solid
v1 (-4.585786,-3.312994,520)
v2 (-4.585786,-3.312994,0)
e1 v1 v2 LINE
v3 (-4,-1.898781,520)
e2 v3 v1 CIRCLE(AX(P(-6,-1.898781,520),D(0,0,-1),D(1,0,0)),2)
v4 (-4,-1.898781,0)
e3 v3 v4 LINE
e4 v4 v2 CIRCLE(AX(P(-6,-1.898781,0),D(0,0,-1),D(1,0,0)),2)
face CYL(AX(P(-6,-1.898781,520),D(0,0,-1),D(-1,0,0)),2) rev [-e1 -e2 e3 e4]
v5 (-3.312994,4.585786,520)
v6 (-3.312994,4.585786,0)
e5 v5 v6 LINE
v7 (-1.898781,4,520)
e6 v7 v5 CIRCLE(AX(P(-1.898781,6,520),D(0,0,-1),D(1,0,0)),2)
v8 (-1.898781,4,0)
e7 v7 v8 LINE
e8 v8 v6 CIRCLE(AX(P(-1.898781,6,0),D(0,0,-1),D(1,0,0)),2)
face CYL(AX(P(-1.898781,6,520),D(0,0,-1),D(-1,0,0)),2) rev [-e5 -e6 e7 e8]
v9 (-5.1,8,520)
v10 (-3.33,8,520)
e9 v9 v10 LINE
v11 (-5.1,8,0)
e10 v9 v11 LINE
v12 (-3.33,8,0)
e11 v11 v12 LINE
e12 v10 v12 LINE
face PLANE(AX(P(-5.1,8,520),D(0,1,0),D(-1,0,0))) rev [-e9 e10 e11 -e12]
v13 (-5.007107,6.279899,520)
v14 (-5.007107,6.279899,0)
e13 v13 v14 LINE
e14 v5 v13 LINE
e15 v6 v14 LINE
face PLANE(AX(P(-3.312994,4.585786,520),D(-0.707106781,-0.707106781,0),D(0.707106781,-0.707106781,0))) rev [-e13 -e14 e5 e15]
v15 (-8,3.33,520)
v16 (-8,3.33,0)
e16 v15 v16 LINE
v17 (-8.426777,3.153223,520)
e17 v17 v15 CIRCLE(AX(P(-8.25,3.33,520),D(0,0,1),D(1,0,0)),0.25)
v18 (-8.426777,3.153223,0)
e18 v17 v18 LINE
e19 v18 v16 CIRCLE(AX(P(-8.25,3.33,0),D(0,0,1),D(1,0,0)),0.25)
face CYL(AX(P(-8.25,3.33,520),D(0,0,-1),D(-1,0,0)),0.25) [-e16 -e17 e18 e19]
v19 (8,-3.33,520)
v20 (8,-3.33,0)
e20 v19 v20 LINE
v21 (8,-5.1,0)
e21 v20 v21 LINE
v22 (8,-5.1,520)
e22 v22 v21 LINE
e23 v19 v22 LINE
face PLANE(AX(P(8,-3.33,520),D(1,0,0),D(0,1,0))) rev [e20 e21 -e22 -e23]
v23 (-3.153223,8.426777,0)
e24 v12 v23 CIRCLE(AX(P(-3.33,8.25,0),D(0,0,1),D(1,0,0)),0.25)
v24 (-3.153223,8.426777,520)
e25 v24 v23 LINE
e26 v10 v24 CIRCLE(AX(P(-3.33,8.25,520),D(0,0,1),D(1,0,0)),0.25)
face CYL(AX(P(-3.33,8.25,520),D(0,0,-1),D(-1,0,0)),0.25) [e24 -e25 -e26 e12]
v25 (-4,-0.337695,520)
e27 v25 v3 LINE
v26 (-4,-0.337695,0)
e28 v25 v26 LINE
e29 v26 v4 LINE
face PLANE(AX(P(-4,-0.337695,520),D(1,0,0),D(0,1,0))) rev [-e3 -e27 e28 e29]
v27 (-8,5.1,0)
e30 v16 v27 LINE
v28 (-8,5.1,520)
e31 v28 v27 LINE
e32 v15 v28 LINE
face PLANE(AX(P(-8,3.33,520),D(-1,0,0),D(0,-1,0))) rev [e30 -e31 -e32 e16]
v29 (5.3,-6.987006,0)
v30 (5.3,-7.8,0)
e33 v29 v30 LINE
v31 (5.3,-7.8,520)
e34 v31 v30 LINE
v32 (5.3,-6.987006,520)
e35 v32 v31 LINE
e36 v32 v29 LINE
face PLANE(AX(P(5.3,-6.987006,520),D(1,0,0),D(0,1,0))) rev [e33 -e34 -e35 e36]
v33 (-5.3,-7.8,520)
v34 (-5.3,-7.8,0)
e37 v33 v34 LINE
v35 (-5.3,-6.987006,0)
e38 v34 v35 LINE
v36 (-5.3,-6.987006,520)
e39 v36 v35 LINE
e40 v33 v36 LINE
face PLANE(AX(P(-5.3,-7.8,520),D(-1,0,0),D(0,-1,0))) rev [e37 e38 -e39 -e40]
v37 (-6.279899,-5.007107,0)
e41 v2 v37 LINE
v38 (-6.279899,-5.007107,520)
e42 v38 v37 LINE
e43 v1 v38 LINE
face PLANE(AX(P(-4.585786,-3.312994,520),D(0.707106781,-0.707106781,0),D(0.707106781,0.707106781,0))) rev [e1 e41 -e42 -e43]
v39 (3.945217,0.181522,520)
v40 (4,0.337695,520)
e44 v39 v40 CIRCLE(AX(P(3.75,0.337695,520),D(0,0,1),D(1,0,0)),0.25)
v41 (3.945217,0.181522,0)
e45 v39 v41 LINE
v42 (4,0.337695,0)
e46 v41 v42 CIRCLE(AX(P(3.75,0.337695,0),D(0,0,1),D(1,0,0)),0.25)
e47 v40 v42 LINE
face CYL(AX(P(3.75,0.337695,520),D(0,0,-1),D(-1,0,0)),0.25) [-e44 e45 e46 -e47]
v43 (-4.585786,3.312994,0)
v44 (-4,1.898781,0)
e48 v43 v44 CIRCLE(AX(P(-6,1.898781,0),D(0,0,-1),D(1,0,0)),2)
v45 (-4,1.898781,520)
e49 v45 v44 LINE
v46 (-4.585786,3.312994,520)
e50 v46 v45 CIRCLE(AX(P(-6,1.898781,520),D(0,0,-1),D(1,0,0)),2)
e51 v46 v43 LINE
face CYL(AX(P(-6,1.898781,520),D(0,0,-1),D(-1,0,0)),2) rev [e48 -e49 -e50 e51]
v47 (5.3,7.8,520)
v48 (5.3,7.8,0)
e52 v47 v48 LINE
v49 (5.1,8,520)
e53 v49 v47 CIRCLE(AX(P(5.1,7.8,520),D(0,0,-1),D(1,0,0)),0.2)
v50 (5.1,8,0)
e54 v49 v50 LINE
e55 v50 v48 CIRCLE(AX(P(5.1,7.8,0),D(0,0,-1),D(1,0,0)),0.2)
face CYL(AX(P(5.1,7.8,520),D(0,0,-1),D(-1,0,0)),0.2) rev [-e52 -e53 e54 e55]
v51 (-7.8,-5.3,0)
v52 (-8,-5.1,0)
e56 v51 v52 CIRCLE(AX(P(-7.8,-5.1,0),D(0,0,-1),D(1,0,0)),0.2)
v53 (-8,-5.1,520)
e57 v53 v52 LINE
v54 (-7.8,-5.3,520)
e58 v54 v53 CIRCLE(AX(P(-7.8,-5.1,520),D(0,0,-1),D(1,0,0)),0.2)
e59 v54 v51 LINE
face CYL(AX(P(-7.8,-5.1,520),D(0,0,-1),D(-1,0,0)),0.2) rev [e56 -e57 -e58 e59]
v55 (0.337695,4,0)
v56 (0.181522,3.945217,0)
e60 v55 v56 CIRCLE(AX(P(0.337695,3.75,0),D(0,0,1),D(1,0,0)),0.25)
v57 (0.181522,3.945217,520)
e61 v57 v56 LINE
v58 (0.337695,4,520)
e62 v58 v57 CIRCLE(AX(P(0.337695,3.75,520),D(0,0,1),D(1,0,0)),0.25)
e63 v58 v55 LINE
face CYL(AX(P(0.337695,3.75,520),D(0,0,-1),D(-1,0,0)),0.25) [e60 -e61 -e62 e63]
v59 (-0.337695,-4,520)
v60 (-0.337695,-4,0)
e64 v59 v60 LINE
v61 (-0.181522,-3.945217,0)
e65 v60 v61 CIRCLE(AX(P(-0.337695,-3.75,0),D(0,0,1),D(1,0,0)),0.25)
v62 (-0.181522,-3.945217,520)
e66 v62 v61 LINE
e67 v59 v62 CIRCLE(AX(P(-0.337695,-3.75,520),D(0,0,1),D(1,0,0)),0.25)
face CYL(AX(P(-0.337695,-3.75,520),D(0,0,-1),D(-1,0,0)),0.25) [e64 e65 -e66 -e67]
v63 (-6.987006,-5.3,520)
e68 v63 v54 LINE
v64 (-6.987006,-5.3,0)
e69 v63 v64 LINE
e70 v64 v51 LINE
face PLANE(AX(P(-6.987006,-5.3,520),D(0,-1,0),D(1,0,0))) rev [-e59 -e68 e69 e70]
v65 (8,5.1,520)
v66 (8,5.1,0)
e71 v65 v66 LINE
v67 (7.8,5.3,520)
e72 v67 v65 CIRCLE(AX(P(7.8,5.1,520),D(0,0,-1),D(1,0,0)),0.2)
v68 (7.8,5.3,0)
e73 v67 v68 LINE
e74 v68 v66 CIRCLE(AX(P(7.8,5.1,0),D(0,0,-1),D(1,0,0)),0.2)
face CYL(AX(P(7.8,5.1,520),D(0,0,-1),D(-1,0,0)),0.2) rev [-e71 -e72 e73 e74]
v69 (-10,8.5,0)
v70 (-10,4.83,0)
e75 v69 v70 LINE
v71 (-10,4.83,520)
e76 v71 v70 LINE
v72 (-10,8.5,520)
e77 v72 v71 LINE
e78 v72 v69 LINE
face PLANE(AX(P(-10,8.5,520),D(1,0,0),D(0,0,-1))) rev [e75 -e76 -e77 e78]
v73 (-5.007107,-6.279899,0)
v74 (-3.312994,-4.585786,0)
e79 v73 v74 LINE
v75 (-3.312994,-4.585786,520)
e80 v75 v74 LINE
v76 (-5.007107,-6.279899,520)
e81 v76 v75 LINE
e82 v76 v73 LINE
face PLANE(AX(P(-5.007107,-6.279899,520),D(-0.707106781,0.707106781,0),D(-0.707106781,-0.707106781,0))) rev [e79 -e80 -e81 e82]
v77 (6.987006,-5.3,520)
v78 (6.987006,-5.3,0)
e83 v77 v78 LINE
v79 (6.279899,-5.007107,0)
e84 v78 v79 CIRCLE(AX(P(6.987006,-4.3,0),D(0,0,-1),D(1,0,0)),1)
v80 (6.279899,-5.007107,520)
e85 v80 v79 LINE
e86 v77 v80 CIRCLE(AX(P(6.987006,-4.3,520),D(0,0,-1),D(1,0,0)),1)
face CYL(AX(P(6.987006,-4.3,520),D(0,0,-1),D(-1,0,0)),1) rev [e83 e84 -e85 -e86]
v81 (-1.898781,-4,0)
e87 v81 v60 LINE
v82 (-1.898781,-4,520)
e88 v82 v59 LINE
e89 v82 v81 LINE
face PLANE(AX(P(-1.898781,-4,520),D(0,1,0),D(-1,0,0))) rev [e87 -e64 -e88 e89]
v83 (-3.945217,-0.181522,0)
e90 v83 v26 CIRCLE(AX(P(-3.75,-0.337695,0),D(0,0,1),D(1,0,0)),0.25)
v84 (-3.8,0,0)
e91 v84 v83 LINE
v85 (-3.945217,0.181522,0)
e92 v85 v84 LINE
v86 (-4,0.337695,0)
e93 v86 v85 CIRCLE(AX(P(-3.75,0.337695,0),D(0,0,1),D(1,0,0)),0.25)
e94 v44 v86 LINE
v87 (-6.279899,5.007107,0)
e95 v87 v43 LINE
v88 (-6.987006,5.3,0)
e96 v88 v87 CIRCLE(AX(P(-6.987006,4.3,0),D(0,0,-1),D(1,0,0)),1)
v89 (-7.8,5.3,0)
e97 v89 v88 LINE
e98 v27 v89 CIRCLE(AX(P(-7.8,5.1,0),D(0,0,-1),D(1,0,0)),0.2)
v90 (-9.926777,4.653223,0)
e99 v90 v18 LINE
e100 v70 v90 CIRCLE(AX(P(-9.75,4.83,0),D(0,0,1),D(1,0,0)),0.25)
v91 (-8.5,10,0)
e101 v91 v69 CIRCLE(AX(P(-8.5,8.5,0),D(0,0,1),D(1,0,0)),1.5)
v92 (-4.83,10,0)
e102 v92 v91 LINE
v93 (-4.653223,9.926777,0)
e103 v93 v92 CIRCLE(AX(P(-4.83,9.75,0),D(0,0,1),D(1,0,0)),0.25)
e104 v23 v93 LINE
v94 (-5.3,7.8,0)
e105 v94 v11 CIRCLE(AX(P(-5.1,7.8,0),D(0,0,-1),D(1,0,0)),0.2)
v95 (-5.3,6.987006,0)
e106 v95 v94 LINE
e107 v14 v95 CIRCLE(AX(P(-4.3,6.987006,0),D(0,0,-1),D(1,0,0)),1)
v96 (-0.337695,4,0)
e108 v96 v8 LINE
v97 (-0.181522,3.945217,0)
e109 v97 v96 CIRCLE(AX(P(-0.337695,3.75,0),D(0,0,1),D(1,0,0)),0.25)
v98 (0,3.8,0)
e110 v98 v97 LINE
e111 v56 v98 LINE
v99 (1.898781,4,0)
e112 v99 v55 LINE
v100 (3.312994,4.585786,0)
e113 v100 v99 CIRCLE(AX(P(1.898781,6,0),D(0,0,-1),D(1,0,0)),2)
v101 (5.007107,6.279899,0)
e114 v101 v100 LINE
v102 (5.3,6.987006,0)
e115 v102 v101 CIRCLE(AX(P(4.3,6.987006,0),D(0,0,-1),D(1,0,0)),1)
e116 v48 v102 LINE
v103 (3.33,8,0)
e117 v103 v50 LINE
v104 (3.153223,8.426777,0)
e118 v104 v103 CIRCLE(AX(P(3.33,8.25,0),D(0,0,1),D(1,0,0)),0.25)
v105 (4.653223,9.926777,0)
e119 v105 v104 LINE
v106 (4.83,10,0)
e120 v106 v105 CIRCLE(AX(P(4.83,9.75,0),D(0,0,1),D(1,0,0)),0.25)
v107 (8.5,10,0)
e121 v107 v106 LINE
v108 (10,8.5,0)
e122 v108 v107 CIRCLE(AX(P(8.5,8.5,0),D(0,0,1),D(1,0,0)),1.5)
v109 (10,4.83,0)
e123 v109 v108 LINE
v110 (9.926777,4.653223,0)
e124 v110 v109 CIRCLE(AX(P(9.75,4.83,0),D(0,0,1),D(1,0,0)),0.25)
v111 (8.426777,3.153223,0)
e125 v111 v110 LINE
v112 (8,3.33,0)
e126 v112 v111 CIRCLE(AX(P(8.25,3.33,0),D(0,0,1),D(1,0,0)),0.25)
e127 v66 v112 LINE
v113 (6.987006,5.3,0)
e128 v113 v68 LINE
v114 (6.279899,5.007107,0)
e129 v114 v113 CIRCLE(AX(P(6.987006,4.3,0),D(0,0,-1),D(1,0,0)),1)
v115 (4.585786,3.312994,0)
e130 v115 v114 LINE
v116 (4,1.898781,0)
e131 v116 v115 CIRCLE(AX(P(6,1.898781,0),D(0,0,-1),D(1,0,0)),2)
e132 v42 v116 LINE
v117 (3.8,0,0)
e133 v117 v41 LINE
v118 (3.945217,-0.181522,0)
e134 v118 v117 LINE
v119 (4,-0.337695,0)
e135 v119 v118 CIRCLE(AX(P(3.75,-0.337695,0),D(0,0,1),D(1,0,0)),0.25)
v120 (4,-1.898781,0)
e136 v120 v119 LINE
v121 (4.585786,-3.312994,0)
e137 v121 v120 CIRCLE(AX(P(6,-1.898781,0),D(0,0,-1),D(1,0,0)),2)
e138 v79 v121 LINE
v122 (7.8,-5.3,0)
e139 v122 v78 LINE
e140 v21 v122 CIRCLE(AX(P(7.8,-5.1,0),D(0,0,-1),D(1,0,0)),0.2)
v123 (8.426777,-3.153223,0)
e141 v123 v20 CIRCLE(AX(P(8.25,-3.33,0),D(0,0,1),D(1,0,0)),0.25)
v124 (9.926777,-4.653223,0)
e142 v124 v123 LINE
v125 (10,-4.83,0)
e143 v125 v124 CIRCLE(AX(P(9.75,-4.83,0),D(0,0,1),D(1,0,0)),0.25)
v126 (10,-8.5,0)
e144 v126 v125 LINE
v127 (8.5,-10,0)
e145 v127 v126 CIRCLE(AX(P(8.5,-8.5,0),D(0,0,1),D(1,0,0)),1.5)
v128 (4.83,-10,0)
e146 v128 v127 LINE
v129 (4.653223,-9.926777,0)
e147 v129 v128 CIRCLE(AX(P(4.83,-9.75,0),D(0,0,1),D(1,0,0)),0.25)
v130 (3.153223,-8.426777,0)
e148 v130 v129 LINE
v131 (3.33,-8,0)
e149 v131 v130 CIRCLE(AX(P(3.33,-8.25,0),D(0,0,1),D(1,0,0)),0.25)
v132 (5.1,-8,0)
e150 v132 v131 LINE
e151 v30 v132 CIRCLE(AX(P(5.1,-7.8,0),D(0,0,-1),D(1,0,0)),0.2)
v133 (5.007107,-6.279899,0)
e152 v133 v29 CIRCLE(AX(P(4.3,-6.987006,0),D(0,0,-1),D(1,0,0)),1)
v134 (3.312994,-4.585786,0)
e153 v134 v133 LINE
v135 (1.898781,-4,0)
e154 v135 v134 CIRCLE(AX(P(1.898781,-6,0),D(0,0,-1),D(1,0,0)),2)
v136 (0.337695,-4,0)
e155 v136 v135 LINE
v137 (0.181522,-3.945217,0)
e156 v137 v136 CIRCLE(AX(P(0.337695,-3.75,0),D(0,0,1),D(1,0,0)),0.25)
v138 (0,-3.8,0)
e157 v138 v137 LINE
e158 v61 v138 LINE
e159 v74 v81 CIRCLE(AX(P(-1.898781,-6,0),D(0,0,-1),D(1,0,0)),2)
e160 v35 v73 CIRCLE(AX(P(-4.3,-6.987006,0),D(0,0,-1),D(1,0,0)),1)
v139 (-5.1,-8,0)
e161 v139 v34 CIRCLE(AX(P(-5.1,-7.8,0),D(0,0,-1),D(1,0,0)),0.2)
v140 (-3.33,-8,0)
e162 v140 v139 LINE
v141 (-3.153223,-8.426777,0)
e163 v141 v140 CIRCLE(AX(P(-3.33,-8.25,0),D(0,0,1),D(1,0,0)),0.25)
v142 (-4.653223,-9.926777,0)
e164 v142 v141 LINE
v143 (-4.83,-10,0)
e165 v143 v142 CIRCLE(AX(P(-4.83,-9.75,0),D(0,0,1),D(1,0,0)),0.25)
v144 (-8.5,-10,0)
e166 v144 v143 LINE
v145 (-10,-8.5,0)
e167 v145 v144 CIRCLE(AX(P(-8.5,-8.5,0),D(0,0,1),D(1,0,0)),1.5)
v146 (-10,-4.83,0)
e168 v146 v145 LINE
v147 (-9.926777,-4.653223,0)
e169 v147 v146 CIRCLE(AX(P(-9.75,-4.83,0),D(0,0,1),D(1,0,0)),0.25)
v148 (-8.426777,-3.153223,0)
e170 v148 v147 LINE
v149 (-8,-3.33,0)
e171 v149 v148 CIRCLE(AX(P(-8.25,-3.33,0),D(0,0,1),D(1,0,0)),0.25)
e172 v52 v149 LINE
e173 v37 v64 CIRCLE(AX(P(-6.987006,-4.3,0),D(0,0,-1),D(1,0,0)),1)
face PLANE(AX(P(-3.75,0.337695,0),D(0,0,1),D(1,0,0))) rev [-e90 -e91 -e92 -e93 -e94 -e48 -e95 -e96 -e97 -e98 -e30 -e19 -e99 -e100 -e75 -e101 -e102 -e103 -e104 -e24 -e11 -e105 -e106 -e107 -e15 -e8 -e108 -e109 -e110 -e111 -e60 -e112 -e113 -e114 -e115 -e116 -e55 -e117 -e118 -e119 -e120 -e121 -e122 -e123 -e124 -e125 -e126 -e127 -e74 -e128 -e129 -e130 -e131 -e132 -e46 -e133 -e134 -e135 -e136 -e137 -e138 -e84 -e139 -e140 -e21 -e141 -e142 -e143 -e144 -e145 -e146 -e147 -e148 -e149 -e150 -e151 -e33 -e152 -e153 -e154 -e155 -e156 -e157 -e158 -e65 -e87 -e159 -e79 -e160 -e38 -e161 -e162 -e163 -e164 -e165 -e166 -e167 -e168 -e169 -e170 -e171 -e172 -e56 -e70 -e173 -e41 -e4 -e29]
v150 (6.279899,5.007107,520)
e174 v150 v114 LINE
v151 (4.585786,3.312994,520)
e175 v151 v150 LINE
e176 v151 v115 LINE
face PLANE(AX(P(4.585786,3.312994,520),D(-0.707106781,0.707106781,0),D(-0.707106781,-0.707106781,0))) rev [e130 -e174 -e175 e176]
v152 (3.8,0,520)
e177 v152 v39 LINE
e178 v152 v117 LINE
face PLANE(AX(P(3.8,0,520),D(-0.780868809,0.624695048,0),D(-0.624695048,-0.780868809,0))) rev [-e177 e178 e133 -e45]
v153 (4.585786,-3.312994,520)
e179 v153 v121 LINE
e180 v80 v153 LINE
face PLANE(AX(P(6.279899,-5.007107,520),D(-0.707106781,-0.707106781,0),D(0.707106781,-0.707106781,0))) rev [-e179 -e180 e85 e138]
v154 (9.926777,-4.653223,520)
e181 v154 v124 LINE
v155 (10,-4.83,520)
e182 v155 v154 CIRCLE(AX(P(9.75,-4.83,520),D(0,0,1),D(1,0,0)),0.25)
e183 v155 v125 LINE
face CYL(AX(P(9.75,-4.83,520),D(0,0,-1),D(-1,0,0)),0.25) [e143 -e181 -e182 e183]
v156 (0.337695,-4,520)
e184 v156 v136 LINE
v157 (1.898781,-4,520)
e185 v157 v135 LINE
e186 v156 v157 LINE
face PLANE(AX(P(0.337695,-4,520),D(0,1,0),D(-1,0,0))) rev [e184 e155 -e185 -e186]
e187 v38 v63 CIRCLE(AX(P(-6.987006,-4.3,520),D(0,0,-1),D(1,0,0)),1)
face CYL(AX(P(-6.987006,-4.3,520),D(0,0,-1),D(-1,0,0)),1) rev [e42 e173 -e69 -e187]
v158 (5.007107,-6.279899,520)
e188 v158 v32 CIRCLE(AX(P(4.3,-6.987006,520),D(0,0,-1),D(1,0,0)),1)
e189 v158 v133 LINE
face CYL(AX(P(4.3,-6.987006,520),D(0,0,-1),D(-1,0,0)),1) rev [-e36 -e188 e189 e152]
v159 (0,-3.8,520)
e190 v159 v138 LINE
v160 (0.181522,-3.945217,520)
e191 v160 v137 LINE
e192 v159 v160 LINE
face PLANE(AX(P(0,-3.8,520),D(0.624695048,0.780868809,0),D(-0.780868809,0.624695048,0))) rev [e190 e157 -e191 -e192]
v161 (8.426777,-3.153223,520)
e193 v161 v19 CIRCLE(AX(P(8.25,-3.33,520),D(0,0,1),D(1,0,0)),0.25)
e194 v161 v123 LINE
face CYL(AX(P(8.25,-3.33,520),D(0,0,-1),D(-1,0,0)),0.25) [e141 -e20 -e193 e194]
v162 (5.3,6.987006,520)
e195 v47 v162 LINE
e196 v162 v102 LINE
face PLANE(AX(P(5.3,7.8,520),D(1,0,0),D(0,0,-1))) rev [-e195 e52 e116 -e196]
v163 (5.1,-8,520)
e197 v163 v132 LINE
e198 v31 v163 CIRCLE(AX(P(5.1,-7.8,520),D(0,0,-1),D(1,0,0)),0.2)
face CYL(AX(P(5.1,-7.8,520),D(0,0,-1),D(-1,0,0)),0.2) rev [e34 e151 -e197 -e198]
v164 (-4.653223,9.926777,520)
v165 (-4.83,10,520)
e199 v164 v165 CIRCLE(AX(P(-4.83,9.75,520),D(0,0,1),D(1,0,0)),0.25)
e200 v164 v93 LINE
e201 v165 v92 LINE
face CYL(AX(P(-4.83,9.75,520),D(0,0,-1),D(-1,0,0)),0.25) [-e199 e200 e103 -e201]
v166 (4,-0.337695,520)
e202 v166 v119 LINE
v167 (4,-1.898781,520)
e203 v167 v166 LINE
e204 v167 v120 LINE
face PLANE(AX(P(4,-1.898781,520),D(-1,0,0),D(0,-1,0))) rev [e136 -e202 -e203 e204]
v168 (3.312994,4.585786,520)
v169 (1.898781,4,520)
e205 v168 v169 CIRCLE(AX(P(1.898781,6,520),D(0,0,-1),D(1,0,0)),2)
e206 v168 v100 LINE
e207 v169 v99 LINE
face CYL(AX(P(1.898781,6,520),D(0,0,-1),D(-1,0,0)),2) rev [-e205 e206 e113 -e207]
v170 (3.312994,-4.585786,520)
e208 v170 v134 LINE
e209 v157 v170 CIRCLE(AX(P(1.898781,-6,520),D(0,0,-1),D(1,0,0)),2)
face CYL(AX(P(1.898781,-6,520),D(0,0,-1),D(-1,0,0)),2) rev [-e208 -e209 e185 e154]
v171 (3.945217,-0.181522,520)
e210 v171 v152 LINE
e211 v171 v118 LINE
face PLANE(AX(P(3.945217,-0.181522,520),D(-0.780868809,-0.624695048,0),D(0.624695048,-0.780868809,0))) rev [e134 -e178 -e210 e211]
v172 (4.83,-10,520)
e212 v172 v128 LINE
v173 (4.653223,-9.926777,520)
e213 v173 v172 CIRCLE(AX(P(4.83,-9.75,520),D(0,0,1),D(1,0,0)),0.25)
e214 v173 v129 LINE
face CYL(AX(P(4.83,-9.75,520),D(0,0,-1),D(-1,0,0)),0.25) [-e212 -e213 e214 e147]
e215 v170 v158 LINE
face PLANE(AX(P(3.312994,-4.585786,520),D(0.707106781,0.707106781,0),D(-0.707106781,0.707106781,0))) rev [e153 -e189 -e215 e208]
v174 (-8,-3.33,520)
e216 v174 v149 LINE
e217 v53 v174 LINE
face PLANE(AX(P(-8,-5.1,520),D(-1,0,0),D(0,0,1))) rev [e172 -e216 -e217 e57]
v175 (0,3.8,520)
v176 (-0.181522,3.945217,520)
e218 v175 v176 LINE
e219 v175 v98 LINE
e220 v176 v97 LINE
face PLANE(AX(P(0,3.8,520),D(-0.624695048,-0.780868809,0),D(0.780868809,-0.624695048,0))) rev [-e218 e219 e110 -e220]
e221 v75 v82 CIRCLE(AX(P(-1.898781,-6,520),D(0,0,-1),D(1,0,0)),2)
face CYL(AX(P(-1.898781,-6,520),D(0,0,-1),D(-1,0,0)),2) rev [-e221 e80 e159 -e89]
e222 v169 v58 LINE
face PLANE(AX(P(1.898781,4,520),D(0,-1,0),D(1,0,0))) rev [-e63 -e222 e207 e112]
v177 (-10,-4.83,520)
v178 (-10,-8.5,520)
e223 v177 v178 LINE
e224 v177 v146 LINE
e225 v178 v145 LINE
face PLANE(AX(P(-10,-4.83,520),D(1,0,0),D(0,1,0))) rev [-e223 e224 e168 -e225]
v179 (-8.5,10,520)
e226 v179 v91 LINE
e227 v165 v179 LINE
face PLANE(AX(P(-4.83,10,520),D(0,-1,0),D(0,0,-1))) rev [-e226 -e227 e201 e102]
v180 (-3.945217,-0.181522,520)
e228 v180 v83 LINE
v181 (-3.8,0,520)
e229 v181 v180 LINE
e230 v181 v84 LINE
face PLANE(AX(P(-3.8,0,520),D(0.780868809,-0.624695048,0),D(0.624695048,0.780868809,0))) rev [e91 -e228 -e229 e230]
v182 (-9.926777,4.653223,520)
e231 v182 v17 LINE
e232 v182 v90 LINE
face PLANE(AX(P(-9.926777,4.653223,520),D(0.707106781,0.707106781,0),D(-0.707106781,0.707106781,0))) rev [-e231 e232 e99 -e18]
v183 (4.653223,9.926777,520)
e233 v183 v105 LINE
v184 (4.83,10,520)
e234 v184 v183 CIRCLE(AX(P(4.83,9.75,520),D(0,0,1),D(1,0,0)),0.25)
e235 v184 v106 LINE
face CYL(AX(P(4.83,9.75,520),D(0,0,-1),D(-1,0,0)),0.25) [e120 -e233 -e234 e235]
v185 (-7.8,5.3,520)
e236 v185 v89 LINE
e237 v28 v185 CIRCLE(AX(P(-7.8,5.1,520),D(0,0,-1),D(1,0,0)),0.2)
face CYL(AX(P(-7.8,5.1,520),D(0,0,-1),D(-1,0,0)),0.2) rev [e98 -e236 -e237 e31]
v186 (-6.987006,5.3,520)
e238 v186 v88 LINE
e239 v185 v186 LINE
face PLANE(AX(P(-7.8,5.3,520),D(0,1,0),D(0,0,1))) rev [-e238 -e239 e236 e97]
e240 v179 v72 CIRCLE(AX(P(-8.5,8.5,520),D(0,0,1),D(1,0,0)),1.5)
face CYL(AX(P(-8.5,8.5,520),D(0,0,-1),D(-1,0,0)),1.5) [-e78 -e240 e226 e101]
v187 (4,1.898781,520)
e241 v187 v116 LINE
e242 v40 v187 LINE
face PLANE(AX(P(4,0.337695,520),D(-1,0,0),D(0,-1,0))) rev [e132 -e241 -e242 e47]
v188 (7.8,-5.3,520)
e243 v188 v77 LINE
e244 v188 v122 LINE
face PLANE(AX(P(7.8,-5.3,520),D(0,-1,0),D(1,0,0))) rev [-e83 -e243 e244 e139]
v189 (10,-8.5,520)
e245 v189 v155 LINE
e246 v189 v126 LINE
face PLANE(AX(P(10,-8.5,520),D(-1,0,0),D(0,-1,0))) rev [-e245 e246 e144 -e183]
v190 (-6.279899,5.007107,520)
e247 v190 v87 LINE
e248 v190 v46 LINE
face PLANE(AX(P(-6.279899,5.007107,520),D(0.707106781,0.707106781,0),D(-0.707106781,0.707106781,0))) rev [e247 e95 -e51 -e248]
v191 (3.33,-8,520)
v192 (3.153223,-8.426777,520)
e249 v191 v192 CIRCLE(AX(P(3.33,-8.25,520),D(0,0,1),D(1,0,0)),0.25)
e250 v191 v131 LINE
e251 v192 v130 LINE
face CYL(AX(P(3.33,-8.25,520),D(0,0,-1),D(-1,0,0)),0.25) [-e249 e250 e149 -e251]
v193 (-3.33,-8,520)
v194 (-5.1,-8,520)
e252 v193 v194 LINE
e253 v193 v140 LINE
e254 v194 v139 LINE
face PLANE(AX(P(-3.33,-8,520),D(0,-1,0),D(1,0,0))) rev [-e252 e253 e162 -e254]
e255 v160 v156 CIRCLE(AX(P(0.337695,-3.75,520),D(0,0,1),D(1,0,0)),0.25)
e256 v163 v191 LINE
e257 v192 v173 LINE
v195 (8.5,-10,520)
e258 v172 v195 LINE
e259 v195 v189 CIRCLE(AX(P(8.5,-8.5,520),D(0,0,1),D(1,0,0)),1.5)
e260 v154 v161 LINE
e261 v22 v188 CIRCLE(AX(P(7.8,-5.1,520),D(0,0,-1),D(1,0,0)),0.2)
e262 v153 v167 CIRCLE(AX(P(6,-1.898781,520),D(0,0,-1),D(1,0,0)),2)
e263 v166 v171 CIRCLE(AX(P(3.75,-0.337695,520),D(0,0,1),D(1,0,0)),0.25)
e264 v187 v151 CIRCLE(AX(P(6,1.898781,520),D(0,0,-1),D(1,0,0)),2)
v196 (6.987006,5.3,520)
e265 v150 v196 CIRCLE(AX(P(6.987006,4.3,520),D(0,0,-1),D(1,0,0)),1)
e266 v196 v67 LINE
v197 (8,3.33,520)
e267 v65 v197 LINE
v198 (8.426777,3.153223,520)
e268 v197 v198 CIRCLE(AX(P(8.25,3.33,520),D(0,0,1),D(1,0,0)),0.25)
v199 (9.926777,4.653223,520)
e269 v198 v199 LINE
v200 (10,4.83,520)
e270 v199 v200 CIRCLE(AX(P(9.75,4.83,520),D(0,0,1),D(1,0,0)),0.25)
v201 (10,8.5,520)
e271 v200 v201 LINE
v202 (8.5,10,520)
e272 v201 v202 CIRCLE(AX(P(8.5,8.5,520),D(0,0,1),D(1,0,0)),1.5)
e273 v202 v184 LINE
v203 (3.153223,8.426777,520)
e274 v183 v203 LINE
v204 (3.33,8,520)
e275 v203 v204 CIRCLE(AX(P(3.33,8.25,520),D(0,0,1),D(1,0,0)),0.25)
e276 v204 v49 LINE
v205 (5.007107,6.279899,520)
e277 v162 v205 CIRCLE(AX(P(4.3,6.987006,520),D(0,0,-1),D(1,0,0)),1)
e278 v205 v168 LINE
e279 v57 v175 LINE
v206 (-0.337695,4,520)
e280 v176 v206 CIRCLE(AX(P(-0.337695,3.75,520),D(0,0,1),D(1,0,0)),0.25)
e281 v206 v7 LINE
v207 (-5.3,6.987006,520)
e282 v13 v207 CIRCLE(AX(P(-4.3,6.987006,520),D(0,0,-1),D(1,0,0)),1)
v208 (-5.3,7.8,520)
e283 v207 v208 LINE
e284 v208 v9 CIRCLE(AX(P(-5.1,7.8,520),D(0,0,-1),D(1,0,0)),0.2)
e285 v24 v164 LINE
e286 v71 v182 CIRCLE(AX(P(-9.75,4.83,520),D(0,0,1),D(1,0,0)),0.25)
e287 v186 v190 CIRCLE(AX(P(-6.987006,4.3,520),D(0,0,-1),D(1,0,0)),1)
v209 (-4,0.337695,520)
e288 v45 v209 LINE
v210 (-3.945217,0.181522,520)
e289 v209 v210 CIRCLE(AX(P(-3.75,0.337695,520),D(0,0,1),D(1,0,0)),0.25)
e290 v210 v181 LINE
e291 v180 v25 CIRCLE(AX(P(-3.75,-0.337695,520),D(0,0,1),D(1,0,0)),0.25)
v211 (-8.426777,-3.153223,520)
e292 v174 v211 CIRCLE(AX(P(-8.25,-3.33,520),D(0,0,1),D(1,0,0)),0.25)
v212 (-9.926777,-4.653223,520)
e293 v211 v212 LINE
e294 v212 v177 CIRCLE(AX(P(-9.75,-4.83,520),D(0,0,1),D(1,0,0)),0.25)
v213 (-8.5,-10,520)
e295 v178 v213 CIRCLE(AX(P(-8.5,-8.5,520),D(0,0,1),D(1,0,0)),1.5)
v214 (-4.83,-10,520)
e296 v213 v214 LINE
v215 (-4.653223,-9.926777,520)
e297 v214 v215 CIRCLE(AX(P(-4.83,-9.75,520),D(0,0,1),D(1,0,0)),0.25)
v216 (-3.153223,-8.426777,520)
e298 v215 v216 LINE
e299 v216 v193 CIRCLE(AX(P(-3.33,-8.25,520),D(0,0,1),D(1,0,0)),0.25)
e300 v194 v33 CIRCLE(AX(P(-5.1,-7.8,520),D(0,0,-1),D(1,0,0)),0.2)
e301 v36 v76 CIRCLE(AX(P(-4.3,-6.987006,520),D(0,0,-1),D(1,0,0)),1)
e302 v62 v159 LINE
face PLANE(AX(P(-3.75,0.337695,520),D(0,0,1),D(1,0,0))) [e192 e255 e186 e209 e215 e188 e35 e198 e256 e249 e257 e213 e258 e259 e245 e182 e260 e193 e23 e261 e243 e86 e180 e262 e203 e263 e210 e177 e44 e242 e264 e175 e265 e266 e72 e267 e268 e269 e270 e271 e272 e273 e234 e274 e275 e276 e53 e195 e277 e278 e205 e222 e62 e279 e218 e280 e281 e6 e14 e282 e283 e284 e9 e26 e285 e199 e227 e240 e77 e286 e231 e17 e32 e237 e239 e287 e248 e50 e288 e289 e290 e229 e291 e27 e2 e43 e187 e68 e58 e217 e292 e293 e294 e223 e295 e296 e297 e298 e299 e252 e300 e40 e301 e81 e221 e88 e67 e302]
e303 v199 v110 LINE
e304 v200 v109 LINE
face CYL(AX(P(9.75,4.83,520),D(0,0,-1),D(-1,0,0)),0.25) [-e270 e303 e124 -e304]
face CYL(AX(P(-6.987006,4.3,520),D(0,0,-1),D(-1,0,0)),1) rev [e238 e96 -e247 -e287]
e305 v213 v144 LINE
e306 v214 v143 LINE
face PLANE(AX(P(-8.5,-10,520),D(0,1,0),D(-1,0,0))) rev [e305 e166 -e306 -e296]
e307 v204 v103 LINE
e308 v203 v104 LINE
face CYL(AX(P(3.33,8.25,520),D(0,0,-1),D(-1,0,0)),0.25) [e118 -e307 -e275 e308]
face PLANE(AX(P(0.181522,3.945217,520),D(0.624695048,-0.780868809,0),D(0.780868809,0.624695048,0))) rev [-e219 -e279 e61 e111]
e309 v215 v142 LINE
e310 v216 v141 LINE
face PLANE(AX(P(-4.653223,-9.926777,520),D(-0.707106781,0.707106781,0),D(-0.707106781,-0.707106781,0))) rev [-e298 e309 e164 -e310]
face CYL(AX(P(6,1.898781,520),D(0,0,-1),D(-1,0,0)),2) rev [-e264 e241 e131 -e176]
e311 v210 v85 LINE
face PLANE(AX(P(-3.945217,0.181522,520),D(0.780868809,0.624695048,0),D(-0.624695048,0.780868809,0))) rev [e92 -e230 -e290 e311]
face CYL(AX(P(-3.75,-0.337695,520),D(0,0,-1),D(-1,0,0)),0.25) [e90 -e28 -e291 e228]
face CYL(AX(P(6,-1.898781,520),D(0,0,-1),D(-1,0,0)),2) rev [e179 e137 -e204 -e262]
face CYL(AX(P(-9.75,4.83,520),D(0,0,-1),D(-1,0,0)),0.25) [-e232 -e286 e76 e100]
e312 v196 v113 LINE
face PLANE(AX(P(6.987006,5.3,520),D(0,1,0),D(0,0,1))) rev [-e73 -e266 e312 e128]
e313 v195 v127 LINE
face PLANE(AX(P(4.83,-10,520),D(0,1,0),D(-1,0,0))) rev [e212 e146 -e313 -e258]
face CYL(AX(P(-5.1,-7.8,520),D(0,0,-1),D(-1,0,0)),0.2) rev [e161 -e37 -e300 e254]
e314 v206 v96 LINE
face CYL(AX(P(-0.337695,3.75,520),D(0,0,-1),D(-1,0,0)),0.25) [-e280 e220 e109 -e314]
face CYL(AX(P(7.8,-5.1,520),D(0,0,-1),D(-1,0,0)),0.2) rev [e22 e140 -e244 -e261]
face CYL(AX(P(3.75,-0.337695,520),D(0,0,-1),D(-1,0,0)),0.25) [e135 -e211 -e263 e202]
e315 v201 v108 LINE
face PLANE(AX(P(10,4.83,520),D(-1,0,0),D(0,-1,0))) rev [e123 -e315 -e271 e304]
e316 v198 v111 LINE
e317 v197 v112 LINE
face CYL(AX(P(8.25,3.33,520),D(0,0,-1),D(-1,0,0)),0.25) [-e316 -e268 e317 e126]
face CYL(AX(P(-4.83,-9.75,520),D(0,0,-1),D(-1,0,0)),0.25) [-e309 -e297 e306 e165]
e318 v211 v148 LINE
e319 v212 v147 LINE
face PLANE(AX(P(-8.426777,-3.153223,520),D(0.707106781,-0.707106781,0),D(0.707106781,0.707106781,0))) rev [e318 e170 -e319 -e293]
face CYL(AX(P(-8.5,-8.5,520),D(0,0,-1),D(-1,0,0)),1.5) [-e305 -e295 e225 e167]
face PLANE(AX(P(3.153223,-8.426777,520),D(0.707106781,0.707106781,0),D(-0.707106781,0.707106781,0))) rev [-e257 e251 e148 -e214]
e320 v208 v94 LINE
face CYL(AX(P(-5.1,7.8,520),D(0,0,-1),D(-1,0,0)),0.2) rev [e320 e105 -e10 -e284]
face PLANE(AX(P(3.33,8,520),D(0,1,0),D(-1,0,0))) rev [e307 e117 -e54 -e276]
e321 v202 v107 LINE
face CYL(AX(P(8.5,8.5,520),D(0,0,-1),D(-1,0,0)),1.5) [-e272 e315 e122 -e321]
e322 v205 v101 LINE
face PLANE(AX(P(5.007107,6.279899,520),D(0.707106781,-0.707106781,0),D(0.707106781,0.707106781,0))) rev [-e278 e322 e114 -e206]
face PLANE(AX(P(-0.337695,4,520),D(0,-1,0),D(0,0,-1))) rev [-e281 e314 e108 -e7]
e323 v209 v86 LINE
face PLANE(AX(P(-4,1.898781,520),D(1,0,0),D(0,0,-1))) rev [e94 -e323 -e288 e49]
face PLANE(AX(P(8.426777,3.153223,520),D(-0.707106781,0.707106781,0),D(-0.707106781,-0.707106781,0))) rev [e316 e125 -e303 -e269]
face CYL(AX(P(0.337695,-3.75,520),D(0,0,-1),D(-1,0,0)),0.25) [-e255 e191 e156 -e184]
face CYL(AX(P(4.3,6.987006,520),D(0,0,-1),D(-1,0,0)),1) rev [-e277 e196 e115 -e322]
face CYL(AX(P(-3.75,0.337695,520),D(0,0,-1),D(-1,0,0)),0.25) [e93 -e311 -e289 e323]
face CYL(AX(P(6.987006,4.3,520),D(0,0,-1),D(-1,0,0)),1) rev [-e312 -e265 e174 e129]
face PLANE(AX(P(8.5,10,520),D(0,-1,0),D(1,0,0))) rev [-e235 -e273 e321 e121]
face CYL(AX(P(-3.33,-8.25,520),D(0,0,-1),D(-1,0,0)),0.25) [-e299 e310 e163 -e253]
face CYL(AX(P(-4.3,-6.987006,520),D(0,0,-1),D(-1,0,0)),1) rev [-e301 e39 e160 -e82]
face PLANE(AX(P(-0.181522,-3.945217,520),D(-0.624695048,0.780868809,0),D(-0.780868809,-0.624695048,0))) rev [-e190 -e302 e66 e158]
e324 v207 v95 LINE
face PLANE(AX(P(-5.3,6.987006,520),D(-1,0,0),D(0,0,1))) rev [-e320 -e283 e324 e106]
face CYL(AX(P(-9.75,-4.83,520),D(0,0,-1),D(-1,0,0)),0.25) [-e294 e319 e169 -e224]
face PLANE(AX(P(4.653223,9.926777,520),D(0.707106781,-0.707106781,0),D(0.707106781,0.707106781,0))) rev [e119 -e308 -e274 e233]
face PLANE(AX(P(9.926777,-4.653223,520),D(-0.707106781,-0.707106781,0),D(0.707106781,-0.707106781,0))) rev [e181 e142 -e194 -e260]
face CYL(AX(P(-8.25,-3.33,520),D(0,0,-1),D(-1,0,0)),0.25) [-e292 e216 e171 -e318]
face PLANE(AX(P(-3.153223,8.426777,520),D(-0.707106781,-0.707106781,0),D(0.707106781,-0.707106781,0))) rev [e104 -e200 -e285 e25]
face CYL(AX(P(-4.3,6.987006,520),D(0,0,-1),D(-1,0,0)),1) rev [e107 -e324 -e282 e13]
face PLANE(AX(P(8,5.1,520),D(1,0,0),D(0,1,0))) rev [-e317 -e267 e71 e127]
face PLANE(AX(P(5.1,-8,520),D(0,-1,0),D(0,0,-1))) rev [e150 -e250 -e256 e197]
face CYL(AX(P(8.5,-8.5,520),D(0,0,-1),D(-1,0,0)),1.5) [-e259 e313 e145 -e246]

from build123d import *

# Parameters (mm, degrees)
EXTRUDE_1_DEPTH = 520


# Read off the part's stored shape, not the designer's step: 222 Конструкционный профиль 20х20-1-surface1
with BuildPart() as part:
    # Эскиз1 → Бобышка-Вытянуть1 (new body)
    with BuildSketch(Plane.XY):
        with BuildLine():
            Line((-3.945217202, 0.181521503), (-3.8, 0))
            Line((-3.8, 0), (-3.945217202, -0.181521503))
            ThreePointArc((-3.945217202, -0.181521503), (-3.98590708, -0.254943529), (-4, -0.337695265))
            Line((-4, -0.337695265), (-4, -1.898780669))
            ThreePointArc((-4, -1.898780669), (-4.152240935, -2.664147534), (-4.585786438, -3.312994231))
            Line((-4.585786438, -3.312994231), (-6.279898987, -5.007106781))
            ThreePointArc((-6.279898987, -5.007106781), (-6.604322336, -5.223879533), (-6.987005769, -5.3))
            Line((-6.987005769, -5.3), (-7.8, -5.3))
            ThreePointArc((-7.8, -5.3), (-7.941421356, -5.241421356), (-8, -5.1))
            Line((-8, -5.1), (-8, -3.33))
            ThreePointArc((-8, -3.33), (-8.154329142, -3.099030117), (-8.426776695, -3.153223305))
            Line((-8.426776695, -3.153223305), (-9.926776695, -4.653223305))
            ThreePointArc((-9.926776695, -4.653223305), (-9.980969883, -4.734329142), (-10, -4.83))
            Line((-10, -4.83), (-10, -8.5))
            ThreePointArc((-10, -8.5), (-9.560660172, -9.560660172), (-8.5, -10))
            Line((-8.5, -10), (-4.83, -10))
            ThreePointArc((-4.83, -10), (-4.734329142, -9.980969883), (-4.653223305, -9.926776695))
            Line((-4.653223305, -9.926776695), (-3.153223305, -8.426776695))
            ThreePointArc((-3.153223305, -8.426776695), (-3.099030117, -8.154329142), (-3.33, -8))
            Line((-3.33, -8), (-5.1, -8))
            ThreePointArc((-5.1, -8), (-5.241421356, -7.941421356), (-5.3, -7.8))
            Line((-5.3, -7.8), (-5.3, -6.987005769))
            ThreePointArc((-5.3, -6.987005769), (-5.223879533, -6.604322336), (-5.007106781, -6.279898987))
            Line((-5.007106781, -6.279898987), (-3.312994231, -4.585786438))
            ThreePointArc((-3.312994231, -4.585786438), (-2.664147534, -4.152240935), (-1.898780669, -4))
            Line((-1.898780669, -4), (-0.337695265, -4))
            ThreePointArc((-0.337695265, -4), (-0.254943529, -3.98590708), (-0.181521503, -3.945217202))
            Line((-0.181521503, -3.945217202), (0, -3.8))
            Line((0, -3.8), (0.181521503, -3.945217202))
            ThreePointArc((0.181521503, -3.945217202), (0.254943529, -3.98590708), (0.337695265, -4))
            Line((0.337695265, -4), (1.898780669, -4))
            ThreePointArc((1.898780669, -4), (2.664147534, -4.152240935), (3.312994231, -4.585786438))
            Line((3.312994231, -4.585786438), (5.007106781, -6.279898987))
            ThreePointArc((5.007106781, -6.279898987), (5.223879533, -6.604322336), (5.3, -6.987005769))
            Line((5.3, -6.987005769), (5.3, -7.8))
            ThreePointArc((5.3, -7.8), (5.241421356, -7.941421356), (5.1, -8))
            Line((5.1, -8), (3.33, -8))
            ThreePointArc((3.33, -8), (3.099030117, -8.154329142), (3.153223305, -8.426776695))
            Line((3.153223305, -8.426776695), (4.653223305, -9.926776695))
            ThreePointArc((4.653223305, -9.926776695), (4.734329142, -9.980969883), (4.83, -10))
            Line((4.83, -10), (8.5, -10))
            ThreePointArc((8.5, -10), (9.560660172, -9.560660172), (10, -8.5))
            Line((10, -8.5), (10, -4.83))
            ThreePointArc((10, -4.83), (9.980969883, -4.734329142), (9.926776695, -4.653223305))
            Line((9.926776695, -4.653223305), (8.426776695, -3.153223305))
            ThreePointArc((8.426776695, -3.153223305), (8.154329142, -3.099030117), (8, -3.33))
            Line((8, -3.33), (8, -5.1))
            ThreePointArc((8, -5.1), (7.941421356, -5.241421356), (7.8, -5.3))
            Line((7.8, -5.3), (6.987005769, -5.3))
            ThreePointArc((6.987005769, -5.3), (6.604322336, -5.223879533), (6.279898987, -5.007106781))
            Line((6.279898987, -5.007106781), (4.585786438, -3.312994231))
            ThreePointArc((4.585786438, -3.312994231), (4.152240935, -2.664147534), (4, -1.898780669))
            Line((4, -1.898780669), (4, -0.337695265))
            ThreePointArc((4, -0.337695265), (3.98590708, -0.254943529), (3.945217202, -0.181521503))
            Line((3.945217202, -0.181521503), (3.8, 0))
            Line((3.8, 0), (3.945217202, 0.181521503))
            ThreePointArc((3.945217202, 0.181521503), (3.98590708, 0.254943529), (4, 0.337695265))
            Line((4, 0.337695265), (4, 1.898780669))
            ThreePointArc((4, 1.898780669), (4.152240935, 2.664147534), (4.585786438, 3.312994231))
            Line((4.585786438, 3.312994231), (6.279898987, 5.007106781))
            ThreePointArc((6.279898987, 5.007106781), (6.604322336, 5.223879533), (6.987005769, 5.3))
            Line((6.987005769, 5.3), (7.8, 5.3))
            ThreePointArc((7.8, 5.3), (7.941421356, 5.241421356), (8, 5.1))
            Line((8, 5.1), (8, 3.33))
            ThreePointArc((8, 3.33), (8.154329142, 3.099030117), (8.426776695, 3.153223305))
            Line((8.426776695, 3.153223305), (9.926776695, 4.653223305))
            ThreePointArc((9.926776695, 4.653223305), (9.980969883, 4.734329142), (10, 4.83))
            Line((10, 4.83), (10, 8.5))
            ThreePointArc((10, 8.5), (9.560660172, 9.560660172), (8.5, 10))
            Line((8.5, 10), (4.83, 10))
            ThreePointArc((4.83, 10), (4.734329142, 9.980969883), (4.653223305, 9.926776695))
            Line((4.653223305, 9.926776695), (3.153223305, 8.426776695))
            ThreePointArc((3.153223305, 8.426776695), (3.099030117, 8.154329142), (3.33, 8))
            Line((3.33, 8), (5.1, 8))
            ThreePointArc((5.1, 8), (5.241421356, 7.941421356), (5.3, 7.8))
            Line((5.3, 7.8), (5.3, 6.987005769))
            ThreePointArc((5.3, 6.987005769), (5.223879533, 6.604322336), (5.007106781, 6.279898987))
            Line((5.007106781, 6.279898987), (3.312994231, 4.585786438))
            ThreePointArc((3.312994231, 4.585786438), (2.664147534, 4.152240935), (1.898780669, 4))
            Line((1.898780669, 4), (0.337695265, 4))
            ThreePointArc((0.337695265, 4), (0.254943529, 3.98590708), (0.181521503, 3.945217202))
            Line((0.181521503, 3.945217202), (0, 3.8))
            Line((0, 3.8), (-0.181521503, 3.945217202))
            ThreePointArc((-0.181521503, 3.945217202), (-0.254943529, 3.98590708), (-0.337695265, 4))
            Line((-0.337695265, 4), (-1.898780669, 4))
            ThreePointArc((-1.898780669, 4), (-2.664147534, 4.152240935), (-3.312994231, 4.585786438))
            Line((-3.312994231, 4.585786438), (-5.007106781, 6.279898987))
            ThreePointArc((-5.007106781, 6.279898987), (-5.223879533, 6.604322336), (-5.3, 6.987005769))
            Line((-5.3, 6.987005769), (-5.3, 7.8))
            ThreePointArc((-5.3, 7.8), (-5.241421356, 7.941421356), (-5.1, 8))
            Line((-5.1, 8), (-3.33, 8))
            ThreePointArc((-3.33, 8), (-3.099030117, 8.154329142), (-3.153223305, 8.426776695))
            Line((-3.153223305, 8.426776695), (-4.653223305, 9.926776695))
            ThreePointArc((-4.653223305, 9.926776695), (-4.734329142, 9.980969883), (-4.83, 10))
            Line((-4.83, 10), (-8.5, 10))
            ThreePointArc((-8.5, 10), (-9.560660172, 9.560660172), (-10, 8.5))
            Line((-10, 8.5), (-10, 4.83))
            ThreePointArc((-10, 4.83), (-9.980969883, 4.734329142), (-9.926776695, 4.653223305))
            Line((-9.926776695, 4.653223305), (-8.426776695, 3.153223305))
            ThreePointArc((-8.426776695, 3.153223305), (-8.154329142, 3.099030117), (-8, 3.33))
            Line((-8, 3.33), (-8, 5.1))
            ThreePointArc((-8, 5.1), (-7.941421356, 5.241421356), (-7.8, 5.3))
            Line((-7.8, 5.3), (-6.987005769, 5.3))
            ThreePointArc((-6.987005769, 5.3), (-6.604322336, 5.223879533), (-6.279898987, 5.007106781))
            Line((-6.279898987, 5.007106781), (-4.585786438, 3.312994231))
            ThreePointArc((-4.585786438, 3.312994231), (-4.152240935, 2.664147534), (-4, 1.898780669))
            Line((-4, 1.898780669), (-4, 0.337695265))
            ThreePointArc((-4, 0.337695265), (-3.98590708, 0.254943529), (-3.945217202, 0.181521503))
        make_face()
    extrude(amount=EXTRUDE_1_DEPTH)


solid = part.part
